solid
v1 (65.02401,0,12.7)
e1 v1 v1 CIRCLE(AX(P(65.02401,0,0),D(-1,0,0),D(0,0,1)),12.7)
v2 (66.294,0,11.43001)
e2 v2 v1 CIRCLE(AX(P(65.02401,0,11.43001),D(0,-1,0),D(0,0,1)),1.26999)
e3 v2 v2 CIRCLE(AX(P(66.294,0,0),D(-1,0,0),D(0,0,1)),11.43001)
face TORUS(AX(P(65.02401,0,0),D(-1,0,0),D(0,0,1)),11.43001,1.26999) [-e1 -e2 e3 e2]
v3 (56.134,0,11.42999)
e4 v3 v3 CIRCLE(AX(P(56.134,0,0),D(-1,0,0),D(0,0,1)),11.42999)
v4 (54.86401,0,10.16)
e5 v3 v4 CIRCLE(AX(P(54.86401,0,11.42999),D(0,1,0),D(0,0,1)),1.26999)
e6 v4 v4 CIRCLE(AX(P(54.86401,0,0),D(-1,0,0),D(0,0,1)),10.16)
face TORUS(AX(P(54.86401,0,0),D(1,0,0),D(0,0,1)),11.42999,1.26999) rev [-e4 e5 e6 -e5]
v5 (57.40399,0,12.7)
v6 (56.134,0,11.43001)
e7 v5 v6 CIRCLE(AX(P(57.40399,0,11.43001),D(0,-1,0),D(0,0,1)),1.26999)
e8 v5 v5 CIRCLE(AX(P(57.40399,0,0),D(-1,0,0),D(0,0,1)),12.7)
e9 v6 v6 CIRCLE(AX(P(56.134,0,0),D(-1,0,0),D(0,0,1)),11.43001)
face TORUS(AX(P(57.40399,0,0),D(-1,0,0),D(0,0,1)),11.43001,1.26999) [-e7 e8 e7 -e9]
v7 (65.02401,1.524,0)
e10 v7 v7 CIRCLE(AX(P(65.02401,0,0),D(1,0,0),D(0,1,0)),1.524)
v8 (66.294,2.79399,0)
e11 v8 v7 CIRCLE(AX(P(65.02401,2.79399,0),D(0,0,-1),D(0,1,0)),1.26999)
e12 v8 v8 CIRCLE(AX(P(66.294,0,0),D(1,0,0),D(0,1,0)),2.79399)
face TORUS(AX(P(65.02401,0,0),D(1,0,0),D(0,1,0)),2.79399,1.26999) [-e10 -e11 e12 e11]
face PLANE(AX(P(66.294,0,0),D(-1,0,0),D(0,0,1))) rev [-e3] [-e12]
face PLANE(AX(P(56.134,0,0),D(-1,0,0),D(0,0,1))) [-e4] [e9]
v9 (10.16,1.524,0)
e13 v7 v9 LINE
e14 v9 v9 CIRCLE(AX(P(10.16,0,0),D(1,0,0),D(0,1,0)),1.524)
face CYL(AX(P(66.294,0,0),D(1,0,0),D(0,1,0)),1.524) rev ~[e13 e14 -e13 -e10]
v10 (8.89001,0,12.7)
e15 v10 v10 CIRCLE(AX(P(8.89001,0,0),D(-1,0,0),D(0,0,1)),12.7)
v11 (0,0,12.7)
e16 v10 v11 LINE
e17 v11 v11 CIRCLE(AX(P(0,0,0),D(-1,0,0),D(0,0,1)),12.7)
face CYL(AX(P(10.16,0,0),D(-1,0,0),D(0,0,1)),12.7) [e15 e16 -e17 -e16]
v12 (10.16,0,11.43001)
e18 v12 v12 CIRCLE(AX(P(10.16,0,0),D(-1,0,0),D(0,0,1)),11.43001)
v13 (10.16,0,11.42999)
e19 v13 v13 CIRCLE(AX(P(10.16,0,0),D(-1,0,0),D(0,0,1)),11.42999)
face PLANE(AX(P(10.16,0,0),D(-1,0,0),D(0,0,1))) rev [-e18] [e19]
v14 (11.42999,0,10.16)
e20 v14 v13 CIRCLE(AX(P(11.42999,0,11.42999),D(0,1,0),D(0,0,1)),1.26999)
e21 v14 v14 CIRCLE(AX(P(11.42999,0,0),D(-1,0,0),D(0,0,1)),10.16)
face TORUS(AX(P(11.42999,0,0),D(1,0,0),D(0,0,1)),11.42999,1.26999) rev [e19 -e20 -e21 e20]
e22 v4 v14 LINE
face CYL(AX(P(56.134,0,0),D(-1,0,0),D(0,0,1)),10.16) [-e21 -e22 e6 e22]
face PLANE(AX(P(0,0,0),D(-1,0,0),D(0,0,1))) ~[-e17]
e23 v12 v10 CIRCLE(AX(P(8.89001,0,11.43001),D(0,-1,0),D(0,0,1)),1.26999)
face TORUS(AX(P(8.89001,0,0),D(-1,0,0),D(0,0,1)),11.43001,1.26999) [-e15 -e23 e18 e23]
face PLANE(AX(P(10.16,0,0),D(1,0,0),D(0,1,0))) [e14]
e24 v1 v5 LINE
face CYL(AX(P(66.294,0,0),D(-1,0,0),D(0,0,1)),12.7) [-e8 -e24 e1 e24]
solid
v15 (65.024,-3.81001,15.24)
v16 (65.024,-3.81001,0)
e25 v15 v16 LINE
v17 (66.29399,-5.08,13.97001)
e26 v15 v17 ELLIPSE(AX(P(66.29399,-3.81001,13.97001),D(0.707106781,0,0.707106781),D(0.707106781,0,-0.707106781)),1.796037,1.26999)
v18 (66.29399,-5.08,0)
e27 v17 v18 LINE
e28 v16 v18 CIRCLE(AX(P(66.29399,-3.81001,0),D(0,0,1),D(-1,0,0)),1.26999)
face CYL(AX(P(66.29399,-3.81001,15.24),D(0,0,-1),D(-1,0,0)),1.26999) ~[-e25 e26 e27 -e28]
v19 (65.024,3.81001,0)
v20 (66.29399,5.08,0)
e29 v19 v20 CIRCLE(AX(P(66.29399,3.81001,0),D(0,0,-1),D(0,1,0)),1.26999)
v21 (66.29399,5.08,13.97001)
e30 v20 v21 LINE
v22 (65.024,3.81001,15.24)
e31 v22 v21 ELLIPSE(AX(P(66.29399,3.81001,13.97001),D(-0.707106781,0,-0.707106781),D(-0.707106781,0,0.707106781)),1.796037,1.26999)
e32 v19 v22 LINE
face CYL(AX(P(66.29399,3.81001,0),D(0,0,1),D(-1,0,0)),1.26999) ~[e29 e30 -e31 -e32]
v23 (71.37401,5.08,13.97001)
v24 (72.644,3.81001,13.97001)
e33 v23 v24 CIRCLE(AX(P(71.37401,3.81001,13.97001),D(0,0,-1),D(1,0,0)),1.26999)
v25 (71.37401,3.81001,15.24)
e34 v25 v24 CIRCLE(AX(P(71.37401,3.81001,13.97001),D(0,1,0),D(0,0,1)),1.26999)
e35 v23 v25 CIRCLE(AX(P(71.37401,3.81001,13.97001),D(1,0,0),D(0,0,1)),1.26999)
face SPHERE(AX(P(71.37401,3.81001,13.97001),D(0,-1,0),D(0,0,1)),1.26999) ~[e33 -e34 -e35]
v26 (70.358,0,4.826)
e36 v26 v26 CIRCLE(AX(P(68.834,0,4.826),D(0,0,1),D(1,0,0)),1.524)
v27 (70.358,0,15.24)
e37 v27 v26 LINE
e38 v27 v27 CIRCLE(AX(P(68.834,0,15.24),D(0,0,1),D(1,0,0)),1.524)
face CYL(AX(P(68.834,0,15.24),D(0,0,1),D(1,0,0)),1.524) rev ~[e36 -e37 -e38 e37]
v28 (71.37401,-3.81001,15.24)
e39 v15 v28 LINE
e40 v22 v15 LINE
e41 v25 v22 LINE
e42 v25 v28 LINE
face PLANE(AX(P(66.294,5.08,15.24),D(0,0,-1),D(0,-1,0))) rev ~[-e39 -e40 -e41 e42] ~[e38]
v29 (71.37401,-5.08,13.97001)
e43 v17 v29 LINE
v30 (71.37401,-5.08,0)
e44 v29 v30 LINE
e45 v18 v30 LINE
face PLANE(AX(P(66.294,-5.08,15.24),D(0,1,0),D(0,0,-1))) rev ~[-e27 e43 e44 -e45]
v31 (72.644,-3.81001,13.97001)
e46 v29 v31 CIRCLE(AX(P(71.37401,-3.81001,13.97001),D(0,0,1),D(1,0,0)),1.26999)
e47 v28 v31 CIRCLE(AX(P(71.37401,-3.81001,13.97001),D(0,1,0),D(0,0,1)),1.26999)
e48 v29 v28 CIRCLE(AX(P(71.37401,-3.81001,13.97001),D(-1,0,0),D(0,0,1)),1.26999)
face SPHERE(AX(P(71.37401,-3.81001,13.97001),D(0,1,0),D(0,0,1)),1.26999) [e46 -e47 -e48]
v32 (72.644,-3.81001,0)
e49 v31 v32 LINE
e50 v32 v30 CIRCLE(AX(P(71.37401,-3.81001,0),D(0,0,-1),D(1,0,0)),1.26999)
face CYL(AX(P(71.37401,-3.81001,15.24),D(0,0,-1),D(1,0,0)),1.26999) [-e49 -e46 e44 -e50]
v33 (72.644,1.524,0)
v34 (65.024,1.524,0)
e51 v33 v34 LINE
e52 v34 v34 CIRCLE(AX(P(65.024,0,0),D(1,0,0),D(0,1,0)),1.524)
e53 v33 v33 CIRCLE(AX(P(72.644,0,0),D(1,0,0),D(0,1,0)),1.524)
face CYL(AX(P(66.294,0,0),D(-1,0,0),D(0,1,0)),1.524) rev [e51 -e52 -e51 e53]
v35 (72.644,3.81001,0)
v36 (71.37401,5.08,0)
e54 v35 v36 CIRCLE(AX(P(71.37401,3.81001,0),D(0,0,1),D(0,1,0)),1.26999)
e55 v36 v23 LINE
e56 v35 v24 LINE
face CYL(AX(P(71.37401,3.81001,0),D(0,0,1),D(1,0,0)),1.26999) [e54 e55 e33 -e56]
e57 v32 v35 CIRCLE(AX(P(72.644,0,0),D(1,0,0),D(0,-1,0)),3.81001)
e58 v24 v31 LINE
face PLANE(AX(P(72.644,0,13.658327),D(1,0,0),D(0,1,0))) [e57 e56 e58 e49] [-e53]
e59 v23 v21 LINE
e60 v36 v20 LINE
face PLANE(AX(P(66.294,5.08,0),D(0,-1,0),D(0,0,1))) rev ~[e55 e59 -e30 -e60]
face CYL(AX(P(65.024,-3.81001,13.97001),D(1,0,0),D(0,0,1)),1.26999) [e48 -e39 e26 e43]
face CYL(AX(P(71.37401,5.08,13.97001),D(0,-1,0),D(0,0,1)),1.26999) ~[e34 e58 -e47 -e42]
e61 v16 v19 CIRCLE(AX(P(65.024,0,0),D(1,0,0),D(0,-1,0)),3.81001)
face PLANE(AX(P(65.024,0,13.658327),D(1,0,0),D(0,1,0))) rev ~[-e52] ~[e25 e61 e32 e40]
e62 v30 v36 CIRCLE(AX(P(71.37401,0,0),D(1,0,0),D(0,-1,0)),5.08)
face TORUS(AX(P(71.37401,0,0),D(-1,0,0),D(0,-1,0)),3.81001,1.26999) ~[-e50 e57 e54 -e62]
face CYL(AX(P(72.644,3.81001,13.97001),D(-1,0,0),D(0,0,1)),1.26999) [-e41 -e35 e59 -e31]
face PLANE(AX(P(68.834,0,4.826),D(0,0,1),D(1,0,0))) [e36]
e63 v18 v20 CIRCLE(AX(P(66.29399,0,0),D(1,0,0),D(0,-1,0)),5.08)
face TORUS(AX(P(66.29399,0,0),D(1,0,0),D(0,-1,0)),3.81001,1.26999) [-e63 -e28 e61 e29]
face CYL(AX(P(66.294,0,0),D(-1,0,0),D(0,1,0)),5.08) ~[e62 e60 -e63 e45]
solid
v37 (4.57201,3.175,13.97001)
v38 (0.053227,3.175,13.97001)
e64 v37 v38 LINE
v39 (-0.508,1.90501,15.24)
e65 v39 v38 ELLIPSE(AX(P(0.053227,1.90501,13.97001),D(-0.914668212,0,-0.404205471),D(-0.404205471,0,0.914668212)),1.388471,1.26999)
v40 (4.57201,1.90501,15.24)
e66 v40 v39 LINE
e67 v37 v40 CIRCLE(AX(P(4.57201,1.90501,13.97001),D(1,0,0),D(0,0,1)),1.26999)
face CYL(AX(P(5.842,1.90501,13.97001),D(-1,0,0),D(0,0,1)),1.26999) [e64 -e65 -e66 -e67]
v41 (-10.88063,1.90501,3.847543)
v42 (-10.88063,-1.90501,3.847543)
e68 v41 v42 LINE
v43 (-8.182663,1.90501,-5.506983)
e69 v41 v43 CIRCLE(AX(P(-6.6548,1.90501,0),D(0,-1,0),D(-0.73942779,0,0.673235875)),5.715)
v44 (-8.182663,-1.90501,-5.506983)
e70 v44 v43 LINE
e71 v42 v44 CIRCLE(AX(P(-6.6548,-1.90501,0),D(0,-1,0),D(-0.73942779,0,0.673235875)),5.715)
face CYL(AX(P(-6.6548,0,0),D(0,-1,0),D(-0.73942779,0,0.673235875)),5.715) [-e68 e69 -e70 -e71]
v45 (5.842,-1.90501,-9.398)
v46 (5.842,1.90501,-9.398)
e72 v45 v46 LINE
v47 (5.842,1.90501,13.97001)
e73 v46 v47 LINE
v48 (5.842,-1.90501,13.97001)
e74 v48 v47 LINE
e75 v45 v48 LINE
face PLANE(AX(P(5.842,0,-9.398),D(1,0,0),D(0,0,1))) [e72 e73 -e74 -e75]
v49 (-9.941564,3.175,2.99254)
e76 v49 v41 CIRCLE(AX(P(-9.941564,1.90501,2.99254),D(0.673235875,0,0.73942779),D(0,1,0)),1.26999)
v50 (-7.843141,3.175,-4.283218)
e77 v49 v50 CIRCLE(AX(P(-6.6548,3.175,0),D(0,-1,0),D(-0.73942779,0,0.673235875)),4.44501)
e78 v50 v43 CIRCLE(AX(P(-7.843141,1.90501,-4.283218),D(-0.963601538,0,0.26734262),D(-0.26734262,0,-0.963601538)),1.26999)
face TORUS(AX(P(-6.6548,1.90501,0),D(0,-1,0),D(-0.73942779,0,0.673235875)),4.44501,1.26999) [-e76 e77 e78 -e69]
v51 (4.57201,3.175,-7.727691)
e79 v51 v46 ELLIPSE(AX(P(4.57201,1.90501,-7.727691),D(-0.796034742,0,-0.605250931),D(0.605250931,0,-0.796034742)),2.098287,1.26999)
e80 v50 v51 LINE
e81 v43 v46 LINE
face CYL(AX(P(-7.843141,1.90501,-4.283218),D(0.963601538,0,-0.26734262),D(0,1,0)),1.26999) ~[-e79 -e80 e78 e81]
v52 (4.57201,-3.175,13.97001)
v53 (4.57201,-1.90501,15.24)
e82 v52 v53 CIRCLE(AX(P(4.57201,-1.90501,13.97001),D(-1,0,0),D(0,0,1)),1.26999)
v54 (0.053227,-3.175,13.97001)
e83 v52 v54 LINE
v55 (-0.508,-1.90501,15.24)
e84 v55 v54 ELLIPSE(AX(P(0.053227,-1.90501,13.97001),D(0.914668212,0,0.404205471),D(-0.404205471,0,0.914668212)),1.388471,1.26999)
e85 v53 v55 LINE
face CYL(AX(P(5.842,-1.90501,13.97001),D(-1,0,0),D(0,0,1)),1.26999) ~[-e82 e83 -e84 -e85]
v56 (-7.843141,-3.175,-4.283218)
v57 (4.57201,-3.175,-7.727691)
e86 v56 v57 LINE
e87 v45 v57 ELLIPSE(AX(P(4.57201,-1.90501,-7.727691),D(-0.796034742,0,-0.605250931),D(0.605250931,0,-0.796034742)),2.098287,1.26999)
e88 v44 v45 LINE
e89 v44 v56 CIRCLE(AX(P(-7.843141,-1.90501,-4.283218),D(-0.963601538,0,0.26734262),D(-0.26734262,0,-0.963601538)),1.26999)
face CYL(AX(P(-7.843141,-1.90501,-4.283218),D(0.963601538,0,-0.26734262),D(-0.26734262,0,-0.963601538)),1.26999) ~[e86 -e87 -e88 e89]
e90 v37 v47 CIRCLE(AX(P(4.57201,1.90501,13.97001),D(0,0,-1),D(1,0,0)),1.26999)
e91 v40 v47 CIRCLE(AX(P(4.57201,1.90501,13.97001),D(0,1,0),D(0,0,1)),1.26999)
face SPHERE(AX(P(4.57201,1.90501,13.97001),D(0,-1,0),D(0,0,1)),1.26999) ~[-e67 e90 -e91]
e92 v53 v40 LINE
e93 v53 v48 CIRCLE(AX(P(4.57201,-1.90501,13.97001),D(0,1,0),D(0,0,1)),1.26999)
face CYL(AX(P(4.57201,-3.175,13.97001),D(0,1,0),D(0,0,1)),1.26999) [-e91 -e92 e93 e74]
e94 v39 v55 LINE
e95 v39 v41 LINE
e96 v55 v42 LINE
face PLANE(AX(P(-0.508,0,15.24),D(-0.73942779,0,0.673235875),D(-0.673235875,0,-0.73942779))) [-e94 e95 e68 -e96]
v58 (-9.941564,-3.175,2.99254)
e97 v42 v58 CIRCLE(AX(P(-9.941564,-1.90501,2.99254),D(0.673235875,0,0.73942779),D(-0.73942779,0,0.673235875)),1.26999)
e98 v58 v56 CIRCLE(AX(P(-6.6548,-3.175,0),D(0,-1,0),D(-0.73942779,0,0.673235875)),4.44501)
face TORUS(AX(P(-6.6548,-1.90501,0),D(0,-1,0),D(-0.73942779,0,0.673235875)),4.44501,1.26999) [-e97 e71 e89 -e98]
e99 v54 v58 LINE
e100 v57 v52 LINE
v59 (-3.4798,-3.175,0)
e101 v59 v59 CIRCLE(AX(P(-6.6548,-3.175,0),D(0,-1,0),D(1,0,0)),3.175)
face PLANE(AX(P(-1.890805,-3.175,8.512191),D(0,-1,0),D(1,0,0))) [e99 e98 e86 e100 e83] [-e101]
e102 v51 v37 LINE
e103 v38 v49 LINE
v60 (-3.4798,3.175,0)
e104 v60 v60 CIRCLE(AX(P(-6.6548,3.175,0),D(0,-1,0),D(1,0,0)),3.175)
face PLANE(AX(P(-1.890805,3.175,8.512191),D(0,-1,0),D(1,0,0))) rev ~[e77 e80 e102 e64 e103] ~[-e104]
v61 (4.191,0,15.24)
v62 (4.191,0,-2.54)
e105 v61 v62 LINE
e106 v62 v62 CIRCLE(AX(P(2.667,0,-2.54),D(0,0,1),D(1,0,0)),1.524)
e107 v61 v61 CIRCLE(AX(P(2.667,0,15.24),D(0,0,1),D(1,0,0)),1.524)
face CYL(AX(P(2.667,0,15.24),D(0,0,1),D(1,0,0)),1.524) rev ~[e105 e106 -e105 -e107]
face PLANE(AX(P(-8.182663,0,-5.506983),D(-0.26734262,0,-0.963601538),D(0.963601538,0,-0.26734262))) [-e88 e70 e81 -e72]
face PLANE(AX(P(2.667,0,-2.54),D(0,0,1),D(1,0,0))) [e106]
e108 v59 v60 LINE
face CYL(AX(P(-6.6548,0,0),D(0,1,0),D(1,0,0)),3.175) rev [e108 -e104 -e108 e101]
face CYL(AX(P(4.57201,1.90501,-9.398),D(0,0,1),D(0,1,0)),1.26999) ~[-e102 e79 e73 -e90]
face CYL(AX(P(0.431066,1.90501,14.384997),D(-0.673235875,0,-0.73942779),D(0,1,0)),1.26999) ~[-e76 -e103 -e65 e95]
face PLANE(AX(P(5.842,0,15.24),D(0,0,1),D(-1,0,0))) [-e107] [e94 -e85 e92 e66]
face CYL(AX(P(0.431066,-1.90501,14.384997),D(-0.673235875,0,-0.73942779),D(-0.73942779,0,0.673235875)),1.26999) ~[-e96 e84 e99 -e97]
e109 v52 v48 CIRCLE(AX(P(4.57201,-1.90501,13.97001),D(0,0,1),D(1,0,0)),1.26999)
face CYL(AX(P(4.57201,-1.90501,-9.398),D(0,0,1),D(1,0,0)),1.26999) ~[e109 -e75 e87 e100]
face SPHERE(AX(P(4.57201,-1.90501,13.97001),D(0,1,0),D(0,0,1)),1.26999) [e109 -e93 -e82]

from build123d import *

# Parameters (mm, degrees)
F0_W      = 5.842
F0_H      = 12.7
F0_R      = 3.175
F2_DEPTH  = 3.175
F3_R      = 1.524
F4_DEPTH  = 1.27
F5_DEPTH  = 6.35
F6_DEPTH  = 56.134
F7_R      = 1.524
F8_DEPTH  = 17.78
F9_R      = 1.524
F10_DEPTH = 10.414
F11_R     = 1.26999
F11_2_R   = 1.26999
F11_3_R   = 1.26999


# Not quite as in the source:
# - a fillet or chamfer is up to 0.001 mm smaller than in the source, because OpenCascade refuses the exact size


with BuildPart() as f1:
    # F0 (on Front) → F1 (revolve)
    with BuildSketch(Plane.XZ):
        Polygon((5.842, 12.7), (5.842, 0), (66.294, 0), (66.294, 12.7), (56.134, 12.7), (56.134, 10.16), (10.16, 10.16), (10.16, 12.7), align=None)
        with Locations((2.921, 6.35)):
            Rectangle(F0_W, F0_H)
    revolve(axis=Axis((33.147, 0, 0), (-1, 0, 0)))

    # F3 (on face) → F6 (cut, through all)
    with BuildSketch(Plane.YZ.offset(66.294)):
        Circle(F3_R)
    extrude(amount=-F6_DEPTH, mode=Mode.SUBTRACT)

    # F11 (radius 1.27 in the source; OpenCascade refuses exactly that, so slightly less here)
    f11_edges = [f1.edges().sort_by_distance(p)[0] for p in [
        (10.16, 0, -12.7),
        (10.16, 0, -10.16),
        (56.134, 0, -12.7),
        (66.294, 0, -12.7),
        (66.294, -1.524, 0),
        (56.134, 0, -10.16),
    ]]
    fillet(f11_edges, radius=F11_R)


with BuildPart() as f2:
    # F0 (on Front) → F2 (new body, symmetric)
    with BuildSketch(Plane.XZ):
        with BuildLine():
            Line((-0.9398, 0), (0, 0))
            Line((0, 0), (0, 12.7))
            Line((0, 12.7), (5.842, 12.7))
            Line((5.842, 12.7), (5.842, 15.24))
            Line((5.842, 15.24), (-0.508, 15.24))
            Line((-0.508, 15.24), (-10.8806298187, 3.8475430269))
            ThreePointArc((-10.8806298187, 3.8475430269), (-4.5919612295, 5.3297205562), (-0.9398, 0))
        make_face()
        with BuildLine():
            ThreePointArc((-8.1826630726, -5.5069827884), (-3.1957909266, -4.5493385486), (-0.9398, 0))
            ThreePointArc((-0.9398, 0), (-4.5919612295, 5.3297205562), (-10.8806298187, 3.8475430269))
            ThreePointArc((-10.8806298187, 3.8475430269), (-12.1459778134, -1.5837270034), (-8.1826630726, -5.5069827884))
        make_face()
        with Locations((-6.6548, 0)):
            Circle(F0_R, mode=Mode.SUBTRACT)
        with BuildLine():
            Line((5.842, 0), (0, 0))
            Line((0, 0), (-0.9398, 0))
            ThreePointArc((-0.9398, 0), (-3.1957909266, -4.5493385486), (-8.1826630726, -5.5069827884))
            Line((-8.1826630726, -5.5069827884), (5.842, -9.398))
            Line((5.842, -9.398), (5.842, 0))
        make_face()
        with Locations((2.921, 6.35)):
            Rectangle(F0_W, F0_H)
    extrude(amount=F2_DEPTH, both=True)

    # F7 (on face) → F8 (cut)
    with BuildSketch(Plane.XY.offset(15.24)):
        with Locations((2.667, 0)):
            Circle(F7_R)
    extrude(amount=-F8_DEPTH, mode=Mode.SUBTRACT)

    # F11#2 (radius 1.27 in the source; OpenCascade refuses exactly that, so slightly less here)
    f11_2_edges = [f2.edges().sort_by_distance(p)[0] for p in [
        (5.842, 0, 15.24),
        (2.667, -3.175, 15.24),
        (2.667, 3.175, 15.24),
        (-5.694315, -3.175, 9.543772),
        (-12.145978, -3.175, -1.583727),
        (-5.694315, 3.175, 9.543772),
        (5.842, 3.175, 2.921),
        (5.842, -3.175, 2.921),
        (-12.145978, 3.175, -1.583727),
        (-1.170332, 3.175, -7.452491),
        (-1.170332, -3.175, -7.452491),
    ]]
    fillet(f11_2_edges, radius=F11_2_R)


with BuildPart() as f4:
    # F3 (on face) → F4 (new body)
    with BuildSketch(Plane.YZ.offset(66.294)):
        with BuildLine():
            ThreePointArc((-5.08, 11.6397422652), (0, 12.7), (5.08, 11.6397422652))
            Line((5.08, 11.6397422652), (5.08, 15.24))
            Line((5.08, 15.24), (-5.08, 15.24))
            Line((-5.08, 15.24), (-5.08, 11.6397422652))
        make_face()
        with BuildLine():
            ThreePointArc((-5.08, 0), (0, 5.08), (5.08, 0))
            Line((5.08, 0), (5.08, 11.6397422652))
            ThreePointArc((5.08, 11.6397422652), (0, 12.7), (-5.08, 11.6397422652))
            Line((-5.08, 11.6397422652), (-5.08, 0))
        make_face()
        with BuildLine():
            ThreePointArc((-5.08, 0), (0, -5.08), (5.08, 0))
            ThreePointArc((5.08, 0), (0, 5.08), (-5.08, 0))
        make_face()
        Circle(F3_R, mode=Mode.SUBTRACT)
    extrude(amount=-F4_DEPTH)

    # F5 (add): a face of the model
    f5_faces = [f4.faces().sort_by_distance(p)[0] for p in [
        (66.294, 0, 5.8085929676),
    ]]
    extrude(f5_faces, amount=F5_DEPTH)

    # F9 (on face) → F10 (cut)
    with BuildSketch(Plane.XY.offset(15.24)):
        with Locations((68.834, 0)):
            Circle(F9_R)
    extrude(amount=-F10_DEPTH, mode=Mode.SUBTRACT)

    # F11#3 (radius 1.27 in the source; OpenCascade refuses exactly that, so slightly less here)
    f11_3_edges = [f4.edges().sort_by_distance(p)[0] for p in [
        (72.644, 0, 15.24),
        (68.834, 5.08, 15.24),
        (68.834, -5.08, 15.24),
        (72.644, -5.08, 7.62),
        (68.834, -5.08, 0),
        (65.024, 0, -5.08),
        (68.834, 5.08, 0),
        (72.644, 0, -5.08),
        (65.024, -5.08, 7.62),
        (65.024, 5.08, 7.62),
        (72.644, 5.08, 7.62),
    ]]
    fillet(f11_3_edges, radius=F11_3_R)


solid = Compound([f1.part, f2.part, f4.part])
